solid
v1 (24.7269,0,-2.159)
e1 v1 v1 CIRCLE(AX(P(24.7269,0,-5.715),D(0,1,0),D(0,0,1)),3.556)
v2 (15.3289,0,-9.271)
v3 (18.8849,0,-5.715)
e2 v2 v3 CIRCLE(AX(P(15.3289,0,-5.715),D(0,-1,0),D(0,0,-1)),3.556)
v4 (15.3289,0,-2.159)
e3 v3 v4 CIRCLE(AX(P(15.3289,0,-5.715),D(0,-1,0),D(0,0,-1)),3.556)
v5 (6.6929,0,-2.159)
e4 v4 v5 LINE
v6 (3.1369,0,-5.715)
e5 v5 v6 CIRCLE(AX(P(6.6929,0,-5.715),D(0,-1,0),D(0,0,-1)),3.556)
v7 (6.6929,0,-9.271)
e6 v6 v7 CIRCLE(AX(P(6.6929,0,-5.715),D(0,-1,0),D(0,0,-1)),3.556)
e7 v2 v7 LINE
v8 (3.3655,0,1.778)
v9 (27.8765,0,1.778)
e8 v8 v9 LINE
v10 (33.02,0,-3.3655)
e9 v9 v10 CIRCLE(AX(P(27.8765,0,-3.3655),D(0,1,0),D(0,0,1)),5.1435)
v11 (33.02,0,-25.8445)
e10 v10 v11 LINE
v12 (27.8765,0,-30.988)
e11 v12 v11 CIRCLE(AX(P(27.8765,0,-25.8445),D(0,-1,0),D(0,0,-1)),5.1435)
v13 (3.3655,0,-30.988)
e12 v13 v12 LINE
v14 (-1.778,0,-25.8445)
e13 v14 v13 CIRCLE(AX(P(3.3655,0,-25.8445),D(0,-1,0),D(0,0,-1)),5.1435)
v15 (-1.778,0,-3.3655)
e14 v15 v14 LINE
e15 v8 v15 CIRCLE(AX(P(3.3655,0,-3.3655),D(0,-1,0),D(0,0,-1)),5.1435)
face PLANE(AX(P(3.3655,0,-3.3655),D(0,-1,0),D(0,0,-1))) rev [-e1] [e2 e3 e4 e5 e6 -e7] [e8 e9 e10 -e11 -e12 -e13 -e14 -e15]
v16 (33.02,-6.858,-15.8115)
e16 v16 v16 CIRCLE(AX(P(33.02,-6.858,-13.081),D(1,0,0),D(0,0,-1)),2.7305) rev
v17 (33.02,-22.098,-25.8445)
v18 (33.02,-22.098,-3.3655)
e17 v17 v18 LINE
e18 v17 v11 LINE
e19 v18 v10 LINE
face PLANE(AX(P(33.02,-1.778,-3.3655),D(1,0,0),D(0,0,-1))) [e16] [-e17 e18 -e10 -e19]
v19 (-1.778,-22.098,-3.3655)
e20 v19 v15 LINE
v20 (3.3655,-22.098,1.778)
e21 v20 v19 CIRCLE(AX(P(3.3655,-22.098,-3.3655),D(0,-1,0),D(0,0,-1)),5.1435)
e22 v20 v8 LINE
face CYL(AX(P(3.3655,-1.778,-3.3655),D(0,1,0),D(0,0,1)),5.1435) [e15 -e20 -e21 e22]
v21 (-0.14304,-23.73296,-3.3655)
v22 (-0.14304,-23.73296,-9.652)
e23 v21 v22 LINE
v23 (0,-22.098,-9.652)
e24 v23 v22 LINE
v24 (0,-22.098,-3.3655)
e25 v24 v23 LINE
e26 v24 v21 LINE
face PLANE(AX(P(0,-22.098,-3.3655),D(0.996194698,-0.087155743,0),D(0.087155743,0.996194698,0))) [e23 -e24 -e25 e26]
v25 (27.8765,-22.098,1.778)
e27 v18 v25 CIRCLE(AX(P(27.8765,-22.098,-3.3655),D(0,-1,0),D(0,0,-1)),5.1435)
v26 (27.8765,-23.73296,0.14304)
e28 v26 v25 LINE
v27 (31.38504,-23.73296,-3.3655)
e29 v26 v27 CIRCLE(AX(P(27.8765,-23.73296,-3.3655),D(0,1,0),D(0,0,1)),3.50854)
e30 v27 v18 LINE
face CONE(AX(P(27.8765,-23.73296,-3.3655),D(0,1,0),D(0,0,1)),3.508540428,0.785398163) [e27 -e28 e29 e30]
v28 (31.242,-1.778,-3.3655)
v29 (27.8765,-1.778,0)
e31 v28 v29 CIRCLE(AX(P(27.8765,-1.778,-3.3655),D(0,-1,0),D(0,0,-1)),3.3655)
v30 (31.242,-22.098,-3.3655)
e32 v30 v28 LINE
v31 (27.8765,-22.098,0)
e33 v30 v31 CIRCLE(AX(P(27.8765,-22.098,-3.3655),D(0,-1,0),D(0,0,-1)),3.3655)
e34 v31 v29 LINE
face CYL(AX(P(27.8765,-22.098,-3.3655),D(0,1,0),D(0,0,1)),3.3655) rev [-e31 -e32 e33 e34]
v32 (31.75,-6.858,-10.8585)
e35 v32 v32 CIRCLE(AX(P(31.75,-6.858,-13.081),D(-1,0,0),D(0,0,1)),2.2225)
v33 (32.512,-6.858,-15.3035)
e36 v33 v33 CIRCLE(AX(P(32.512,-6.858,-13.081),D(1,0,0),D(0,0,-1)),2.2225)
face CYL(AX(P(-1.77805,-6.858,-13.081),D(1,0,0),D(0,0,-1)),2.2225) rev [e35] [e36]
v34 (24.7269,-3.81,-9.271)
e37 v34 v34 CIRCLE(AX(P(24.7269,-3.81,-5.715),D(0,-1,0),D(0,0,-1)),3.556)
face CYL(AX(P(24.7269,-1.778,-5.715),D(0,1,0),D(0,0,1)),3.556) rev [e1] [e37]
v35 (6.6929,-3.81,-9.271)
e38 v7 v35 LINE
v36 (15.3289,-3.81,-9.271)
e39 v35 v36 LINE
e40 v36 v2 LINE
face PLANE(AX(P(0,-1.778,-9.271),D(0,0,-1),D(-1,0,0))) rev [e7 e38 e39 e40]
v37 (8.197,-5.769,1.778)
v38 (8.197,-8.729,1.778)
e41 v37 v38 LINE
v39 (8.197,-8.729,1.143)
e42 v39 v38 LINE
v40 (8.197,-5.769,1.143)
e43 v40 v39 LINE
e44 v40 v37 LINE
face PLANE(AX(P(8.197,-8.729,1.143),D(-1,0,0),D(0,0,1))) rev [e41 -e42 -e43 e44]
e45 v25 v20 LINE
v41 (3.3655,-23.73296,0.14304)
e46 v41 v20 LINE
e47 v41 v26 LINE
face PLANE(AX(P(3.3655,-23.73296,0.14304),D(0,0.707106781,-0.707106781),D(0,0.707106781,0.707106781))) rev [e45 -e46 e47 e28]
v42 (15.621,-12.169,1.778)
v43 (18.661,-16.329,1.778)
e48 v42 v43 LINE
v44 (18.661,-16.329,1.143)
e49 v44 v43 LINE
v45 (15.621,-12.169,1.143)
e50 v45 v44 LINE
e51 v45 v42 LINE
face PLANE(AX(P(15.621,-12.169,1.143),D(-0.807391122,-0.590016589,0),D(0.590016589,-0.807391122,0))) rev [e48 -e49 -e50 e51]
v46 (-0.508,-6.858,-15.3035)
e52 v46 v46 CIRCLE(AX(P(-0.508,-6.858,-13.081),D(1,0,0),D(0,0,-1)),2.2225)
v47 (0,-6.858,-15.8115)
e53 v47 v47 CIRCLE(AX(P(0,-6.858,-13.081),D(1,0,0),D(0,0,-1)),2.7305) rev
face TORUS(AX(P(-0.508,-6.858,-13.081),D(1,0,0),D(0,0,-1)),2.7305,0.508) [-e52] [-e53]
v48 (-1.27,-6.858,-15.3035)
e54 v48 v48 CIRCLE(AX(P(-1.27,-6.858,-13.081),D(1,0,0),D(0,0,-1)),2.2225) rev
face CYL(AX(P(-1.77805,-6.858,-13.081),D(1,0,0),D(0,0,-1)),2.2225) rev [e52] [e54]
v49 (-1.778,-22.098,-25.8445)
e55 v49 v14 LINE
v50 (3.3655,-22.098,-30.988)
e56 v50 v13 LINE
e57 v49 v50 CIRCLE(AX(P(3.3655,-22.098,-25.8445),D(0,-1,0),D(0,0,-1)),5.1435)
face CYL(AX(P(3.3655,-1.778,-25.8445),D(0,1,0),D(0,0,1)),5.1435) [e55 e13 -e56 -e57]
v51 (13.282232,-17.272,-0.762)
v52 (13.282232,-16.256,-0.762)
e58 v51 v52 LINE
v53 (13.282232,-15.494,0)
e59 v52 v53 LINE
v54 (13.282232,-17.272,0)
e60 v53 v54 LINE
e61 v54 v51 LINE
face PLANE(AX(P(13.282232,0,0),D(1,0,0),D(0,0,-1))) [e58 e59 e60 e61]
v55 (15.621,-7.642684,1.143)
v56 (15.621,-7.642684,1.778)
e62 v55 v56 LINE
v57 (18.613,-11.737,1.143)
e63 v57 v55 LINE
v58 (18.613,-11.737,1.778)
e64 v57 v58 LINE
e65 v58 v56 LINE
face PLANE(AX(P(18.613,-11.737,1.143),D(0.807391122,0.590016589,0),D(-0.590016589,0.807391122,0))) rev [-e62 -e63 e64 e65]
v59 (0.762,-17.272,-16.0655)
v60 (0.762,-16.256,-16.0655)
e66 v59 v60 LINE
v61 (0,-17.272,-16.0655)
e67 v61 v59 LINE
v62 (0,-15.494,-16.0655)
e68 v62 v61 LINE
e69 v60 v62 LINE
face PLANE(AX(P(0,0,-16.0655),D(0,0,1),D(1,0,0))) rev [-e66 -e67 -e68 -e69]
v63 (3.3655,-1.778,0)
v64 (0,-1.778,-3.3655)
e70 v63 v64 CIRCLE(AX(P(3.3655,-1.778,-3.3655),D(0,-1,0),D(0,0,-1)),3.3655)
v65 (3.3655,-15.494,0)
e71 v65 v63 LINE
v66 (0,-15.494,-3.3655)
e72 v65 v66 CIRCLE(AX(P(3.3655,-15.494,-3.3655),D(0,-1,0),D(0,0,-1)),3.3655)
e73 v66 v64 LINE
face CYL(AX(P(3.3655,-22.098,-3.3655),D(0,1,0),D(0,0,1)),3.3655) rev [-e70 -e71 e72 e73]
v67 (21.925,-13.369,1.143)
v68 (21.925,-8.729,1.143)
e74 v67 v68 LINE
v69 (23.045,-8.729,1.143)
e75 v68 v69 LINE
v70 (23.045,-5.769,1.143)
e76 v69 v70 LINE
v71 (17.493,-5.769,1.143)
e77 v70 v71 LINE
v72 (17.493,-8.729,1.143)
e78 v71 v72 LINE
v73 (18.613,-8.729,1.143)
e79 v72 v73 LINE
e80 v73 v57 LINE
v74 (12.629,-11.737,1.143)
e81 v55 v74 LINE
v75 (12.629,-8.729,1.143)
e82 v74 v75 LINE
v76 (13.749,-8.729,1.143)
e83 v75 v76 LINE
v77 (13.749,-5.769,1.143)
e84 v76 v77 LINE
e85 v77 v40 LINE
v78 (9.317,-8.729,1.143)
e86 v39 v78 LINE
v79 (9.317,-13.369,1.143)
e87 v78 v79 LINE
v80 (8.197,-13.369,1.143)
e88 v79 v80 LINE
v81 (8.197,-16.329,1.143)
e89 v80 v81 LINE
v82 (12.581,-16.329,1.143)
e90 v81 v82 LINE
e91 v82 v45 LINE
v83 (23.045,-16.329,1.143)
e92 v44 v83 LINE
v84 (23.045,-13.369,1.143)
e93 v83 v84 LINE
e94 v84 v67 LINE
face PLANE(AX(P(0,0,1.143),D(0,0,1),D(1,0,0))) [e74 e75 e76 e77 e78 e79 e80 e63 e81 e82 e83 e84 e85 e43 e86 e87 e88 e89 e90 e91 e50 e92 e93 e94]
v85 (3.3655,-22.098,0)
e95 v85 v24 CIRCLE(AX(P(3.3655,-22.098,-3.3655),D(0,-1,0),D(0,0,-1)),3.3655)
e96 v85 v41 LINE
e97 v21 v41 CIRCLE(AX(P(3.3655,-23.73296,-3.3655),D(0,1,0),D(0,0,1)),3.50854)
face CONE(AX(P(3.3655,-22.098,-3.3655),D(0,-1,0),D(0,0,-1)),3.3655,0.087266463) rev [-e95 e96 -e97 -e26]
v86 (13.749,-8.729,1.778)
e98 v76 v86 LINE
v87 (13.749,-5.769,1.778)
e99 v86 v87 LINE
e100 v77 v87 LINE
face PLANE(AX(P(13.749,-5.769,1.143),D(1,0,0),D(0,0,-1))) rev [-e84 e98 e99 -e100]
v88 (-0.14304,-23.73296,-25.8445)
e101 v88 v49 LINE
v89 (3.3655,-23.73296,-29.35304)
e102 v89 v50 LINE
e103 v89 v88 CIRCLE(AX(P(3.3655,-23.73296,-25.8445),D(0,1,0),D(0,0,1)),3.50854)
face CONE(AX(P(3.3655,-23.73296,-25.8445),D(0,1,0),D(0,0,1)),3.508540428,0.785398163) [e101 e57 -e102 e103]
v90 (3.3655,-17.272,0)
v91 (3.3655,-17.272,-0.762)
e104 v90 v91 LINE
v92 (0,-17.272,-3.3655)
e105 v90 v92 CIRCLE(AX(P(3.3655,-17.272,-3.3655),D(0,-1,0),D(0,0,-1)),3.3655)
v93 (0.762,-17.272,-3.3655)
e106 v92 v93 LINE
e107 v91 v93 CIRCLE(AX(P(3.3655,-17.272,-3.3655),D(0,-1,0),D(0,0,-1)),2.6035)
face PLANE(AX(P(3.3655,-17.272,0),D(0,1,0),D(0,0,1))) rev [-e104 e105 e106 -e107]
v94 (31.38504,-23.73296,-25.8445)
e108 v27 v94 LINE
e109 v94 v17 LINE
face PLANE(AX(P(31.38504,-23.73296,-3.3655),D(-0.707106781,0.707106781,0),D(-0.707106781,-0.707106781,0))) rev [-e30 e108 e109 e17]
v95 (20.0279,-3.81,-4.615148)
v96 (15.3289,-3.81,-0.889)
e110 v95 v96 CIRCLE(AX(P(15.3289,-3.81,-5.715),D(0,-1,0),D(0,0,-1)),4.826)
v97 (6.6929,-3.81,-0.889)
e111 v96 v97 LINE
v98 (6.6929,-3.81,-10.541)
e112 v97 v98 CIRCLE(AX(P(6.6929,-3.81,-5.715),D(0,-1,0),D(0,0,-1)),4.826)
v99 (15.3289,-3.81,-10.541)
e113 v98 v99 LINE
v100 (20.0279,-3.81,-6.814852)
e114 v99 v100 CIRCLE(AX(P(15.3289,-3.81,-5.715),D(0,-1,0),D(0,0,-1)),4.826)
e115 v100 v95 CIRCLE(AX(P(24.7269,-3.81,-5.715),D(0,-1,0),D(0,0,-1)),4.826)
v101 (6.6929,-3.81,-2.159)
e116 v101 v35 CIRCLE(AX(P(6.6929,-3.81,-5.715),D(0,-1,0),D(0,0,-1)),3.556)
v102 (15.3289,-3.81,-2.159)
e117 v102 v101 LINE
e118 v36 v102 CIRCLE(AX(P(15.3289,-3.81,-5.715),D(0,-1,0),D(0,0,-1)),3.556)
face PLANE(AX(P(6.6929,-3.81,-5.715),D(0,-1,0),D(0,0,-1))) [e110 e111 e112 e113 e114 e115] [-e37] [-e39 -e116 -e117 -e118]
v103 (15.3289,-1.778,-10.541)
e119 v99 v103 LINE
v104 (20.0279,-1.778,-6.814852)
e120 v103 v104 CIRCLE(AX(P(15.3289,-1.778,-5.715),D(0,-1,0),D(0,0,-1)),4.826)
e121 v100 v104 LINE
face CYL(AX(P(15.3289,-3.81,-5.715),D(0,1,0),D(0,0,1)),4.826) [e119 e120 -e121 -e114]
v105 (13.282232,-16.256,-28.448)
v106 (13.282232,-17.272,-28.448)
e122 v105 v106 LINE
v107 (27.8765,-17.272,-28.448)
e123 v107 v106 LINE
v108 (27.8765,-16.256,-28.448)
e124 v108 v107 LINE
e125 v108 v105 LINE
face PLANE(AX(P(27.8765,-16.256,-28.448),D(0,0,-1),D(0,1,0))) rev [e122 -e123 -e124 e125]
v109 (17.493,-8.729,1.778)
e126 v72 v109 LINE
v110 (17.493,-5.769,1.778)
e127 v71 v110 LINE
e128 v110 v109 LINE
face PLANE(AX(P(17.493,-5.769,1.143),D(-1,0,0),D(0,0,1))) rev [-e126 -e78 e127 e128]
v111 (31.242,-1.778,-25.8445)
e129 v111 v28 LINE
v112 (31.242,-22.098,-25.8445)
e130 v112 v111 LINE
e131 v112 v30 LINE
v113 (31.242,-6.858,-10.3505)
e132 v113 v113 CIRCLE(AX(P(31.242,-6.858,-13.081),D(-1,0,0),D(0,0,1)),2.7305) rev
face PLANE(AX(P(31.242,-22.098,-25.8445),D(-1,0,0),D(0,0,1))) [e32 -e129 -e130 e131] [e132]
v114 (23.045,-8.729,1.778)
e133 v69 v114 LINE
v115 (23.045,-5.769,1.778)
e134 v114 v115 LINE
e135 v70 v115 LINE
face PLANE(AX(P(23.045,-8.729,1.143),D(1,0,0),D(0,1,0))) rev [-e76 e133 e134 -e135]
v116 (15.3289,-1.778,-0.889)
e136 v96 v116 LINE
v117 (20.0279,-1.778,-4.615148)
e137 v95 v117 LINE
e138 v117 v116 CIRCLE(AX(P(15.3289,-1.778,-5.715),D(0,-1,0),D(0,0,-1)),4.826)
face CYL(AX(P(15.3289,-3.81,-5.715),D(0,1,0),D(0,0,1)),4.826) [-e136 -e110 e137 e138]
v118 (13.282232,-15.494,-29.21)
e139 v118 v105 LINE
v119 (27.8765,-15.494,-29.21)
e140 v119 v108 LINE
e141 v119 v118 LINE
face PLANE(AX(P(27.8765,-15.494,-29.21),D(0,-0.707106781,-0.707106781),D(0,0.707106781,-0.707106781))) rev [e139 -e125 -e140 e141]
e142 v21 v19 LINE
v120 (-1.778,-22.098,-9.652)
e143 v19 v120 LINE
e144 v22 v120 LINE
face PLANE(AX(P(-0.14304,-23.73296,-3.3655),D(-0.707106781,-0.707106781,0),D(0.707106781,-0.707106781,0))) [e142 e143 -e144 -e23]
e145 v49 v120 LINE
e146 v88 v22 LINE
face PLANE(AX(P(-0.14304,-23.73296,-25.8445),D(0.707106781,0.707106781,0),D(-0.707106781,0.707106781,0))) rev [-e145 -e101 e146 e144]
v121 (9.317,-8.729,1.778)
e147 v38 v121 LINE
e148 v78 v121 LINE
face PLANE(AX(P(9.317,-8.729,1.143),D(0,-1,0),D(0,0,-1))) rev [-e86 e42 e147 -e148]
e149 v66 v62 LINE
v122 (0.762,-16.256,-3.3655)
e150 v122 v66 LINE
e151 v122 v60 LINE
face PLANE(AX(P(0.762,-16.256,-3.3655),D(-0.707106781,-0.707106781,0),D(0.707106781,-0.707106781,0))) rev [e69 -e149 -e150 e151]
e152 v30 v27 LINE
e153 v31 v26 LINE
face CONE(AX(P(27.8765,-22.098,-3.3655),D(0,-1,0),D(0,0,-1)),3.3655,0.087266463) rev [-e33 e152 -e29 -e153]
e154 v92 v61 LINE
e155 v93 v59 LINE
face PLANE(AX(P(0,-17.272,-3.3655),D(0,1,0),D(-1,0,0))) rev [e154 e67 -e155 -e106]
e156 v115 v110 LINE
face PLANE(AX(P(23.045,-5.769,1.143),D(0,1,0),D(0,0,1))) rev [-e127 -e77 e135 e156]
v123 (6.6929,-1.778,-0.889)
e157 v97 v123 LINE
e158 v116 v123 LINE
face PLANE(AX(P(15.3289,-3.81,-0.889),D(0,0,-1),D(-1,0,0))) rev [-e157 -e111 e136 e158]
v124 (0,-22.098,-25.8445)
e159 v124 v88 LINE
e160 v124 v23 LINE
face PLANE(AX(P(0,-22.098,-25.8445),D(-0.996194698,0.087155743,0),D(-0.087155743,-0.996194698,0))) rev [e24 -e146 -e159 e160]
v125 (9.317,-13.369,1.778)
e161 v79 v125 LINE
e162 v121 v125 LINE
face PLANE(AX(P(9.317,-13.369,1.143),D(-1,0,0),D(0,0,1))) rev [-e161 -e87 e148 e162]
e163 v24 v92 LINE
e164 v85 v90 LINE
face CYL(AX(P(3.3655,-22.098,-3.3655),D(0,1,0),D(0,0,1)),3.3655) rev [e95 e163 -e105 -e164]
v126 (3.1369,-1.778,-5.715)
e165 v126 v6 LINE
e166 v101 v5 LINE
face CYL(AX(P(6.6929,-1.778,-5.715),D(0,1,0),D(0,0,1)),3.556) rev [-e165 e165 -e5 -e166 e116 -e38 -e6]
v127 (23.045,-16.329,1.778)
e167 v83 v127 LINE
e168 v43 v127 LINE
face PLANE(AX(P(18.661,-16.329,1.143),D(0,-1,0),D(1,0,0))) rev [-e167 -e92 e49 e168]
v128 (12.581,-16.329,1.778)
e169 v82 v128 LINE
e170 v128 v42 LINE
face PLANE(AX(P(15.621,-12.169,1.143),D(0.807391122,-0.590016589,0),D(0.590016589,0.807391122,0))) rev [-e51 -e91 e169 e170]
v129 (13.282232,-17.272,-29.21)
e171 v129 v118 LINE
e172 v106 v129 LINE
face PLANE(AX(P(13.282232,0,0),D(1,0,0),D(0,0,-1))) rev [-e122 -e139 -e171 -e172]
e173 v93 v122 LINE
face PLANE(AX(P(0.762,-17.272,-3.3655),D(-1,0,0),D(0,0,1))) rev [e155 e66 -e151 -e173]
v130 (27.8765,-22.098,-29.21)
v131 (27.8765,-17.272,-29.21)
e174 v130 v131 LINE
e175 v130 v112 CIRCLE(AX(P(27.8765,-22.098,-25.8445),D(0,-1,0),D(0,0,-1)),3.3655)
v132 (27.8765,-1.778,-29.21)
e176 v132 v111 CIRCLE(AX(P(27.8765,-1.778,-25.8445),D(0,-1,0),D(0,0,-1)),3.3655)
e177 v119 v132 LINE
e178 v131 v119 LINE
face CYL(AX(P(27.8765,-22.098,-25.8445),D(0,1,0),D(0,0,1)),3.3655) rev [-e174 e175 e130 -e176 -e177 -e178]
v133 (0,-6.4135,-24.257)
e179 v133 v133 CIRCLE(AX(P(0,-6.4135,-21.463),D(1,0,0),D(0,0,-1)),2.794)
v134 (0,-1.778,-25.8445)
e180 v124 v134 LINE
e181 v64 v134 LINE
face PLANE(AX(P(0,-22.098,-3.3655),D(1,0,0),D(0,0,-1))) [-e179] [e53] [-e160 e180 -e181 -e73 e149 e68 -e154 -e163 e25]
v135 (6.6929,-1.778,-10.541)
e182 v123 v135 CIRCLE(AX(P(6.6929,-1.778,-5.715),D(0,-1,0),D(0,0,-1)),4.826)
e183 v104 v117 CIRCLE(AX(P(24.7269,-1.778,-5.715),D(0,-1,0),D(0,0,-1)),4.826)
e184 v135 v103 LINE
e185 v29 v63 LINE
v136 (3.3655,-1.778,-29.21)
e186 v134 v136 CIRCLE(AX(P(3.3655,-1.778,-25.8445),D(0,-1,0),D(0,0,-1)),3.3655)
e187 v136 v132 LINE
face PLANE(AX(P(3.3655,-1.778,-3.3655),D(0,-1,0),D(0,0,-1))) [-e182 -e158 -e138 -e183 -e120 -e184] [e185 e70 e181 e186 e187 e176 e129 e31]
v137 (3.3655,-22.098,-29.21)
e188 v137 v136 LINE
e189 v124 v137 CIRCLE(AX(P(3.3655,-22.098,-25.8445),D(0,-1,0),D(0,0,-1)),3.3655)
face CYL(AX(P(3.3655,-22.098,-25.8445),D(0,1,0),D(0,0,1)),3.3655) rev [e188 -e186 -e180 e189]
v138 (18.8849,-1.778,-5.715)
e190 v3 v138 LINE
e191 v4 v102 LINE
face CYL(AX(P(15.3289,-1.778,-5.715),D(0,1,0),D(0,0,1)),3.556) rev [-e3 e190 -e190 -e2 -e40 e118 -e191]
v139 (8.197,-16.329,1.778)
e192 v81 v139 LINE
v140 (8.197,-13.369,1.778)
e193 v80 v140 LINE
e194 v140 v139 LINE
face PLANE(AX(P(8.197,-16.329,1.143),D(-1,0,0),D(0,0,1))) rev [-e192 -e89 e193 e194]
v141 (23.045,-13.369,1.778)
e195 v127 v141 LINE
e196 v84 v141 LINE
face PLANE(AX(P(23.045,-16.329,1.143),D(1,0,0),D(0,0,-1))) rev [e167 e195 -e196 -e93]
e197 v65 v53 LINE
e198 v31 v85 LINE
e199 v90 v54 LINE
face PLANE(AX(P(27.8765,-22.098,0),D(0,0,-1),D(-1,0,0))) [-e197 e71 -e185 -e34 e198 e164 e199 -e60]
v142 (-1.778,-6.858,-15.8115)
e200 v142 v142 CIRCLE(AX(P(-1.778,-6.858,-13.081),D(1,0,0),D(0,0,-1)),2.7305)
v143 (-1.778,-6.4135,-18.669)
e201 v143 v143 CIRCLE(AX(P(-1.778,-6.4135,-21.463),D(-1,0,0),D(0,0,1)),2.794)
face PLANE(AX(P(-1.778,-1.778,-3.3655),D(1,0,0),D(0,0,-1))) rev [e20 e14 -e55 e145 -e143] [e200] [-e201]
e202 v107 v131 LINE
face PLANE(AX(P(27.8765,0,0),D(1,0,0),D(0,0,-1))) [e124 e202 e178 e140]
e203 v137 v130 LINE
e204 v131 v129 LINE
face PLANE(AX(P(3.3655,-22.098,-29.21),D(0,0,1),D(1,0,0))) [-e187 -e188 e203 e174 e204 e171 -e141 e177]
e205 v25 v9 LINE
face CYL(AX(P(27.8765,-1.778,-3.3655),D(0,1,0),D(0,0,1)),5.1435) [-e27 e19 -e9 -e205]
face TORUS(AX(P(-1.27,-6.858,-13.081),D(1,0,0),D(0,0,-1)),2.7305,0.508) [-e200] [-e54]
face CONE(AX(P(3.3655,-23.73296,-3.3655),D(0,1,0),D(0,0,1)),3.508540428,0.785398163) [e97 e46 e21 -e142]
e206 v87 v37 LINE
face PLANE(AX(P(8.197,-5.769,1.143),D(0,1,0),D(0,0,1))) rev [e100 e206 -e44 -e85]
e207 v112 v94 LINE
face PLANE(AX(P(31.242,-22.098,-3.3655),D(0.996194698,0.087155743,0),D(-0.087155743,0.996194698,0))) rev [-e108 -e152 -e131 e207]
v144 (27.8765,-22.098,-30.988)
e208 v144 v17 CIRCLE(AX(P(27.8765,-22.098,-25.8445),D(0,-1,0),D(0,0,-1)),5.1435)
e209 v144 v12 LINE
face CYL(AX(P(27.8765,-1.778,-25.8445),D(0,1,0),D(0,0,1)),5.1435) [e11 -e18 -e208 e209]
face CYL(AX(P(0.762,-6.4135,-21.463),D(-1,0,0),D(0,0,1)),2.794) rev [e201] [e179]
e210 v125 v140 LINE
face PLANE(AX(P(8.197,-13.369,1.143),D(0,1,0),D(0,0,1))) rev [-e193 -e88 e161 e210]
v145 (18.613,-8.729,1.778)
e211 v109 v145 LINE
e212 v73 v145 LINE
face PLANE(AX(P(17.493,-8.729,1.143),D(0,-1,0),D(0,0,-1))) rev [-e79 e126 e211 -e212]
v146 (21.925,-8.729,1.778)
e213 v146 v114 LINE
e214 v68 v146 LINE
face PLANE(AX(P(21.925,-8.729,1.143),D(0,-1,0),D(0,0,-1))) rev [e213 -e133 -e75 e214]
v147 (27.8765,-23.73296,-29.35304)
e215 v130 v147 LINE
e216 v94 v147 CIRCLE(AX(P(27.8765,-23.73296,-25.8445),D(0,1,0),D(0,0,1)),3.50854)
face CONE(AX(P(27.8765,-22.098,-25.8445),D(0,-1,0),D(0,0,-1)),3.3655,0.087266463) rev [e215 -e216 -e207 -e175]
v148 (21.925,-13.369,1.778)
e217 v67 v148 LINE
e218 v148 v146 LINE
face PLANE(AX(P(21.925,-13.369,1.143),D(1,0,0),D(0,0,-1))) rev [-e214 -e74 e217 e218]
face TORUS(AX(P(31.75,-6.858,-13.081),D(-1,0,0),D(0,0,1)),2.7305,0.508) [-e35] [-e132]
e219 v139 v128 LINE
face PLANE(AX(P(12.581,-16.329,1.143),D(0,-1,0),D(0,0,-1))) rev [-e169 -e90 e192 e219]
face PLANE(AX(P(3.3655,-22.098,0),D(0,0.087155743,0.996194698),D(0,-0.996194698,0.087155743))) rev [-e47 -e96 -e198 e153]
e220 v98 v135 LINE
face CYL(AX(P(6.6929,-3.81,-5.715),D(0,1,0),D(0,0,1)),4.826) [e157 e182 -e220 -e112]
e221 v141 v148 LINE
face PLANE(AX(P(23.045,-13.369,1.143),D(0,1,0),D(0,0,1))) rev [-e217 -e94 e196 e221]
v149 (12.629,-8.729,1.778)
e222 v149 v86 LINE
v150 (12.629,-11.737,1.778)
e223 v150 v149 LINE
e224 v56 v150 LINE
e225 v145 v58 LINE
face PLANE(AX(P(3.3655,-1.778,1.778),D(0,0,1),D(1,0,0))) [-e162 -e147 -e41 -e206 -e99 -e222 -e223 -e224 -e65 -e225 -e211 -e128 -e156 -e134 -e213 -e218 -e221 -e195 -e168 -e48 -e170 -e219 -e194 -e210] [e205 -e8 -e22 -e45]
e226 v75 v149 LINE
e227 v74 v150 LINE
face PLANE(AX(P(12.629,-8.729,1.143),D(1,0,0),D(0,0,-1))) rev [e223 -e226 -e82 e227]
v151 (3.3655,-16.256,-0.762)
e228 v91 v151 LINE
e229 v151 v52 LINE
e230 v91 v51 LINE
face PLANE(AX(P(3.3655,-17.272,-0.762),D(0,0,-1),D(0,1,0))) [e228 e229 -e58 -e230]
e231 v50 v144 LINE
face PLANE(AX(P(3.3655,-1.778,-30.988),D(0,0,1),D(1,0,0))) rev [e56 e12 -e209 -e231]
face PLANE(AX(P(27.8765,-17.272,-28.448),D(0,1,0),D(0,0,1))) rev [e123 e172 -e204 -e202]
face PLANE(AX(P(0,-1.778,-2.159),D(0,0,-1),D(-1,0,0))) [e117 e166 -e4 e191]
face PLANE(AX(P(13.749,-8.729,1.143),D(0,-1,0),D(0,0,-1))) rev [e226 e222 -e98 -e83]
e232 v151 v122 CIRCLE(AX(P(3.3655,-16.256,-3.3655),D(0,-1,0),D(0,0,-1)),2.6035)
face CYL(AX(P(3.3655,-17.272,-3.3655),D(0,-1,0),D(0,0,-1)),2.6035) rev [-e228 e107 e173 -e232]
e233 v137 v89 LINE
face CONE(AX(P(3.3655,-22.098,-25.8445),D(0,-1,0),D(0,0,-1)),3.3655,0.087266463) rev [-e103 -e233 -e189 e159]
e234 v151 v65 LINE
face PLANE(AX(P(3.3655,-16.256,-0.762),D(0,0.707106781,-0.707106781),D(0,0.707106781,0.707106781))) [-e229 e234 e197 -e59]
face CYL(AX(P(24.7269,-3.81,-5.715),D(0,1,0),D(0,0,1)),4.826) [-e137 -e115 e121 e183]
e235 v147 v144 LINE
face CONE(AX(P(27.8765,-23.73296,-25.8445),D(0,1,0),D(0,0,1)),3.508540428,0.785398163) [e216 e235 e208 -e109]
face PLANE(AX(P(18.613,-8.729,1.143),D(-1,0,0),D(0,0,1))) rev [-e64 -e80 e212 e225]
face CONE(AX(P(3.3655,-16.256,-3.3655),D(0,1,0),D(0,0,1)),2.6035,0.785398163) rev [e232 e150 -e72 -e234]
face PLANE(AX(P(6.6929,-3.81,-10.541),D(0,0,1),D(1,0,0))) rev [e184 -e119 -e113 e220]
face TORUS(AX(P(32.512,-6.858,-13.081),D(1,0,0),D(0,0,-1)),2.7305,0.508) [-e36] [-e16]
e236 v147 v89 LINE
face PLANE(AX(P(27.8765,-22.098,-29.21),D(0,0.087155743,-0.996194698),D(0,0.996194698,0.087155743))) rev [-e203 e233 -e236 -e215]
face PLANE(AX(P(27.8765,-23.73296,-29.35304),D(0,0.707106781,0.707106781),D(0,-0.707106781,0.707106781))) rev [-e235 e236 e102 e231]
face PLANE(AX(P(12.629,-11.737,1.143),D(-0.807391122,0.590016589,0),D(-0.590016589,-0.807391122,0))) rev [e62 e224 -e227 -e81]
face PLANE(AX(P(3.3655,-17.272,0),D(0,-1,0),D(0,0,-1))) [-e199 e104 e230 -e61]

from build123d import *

# Parameters (mm, degrees)
BOSS_EXTRUDE1_DEPTH = 1.778
BOSS_EXTRUDE2_DEPTH = 20.32
SKETCH5_R           = 3.556
SKETCH5_W           = 15.748
SKETCH5_H           = 7.112
CUT_EXTRUDE1_DEPTH  = 1.778
FILLET1_R           = 3.556
SKETCH9_R           = 3.556
BOSS_EXTRUDE3_DEPTH = 2.032
SWEEP2_START        = 13.282231977
SWEEP2_DEPTH        = 14.594268023
CUT_EXTRUDE4_DEPTH  = 0.635
SKETCH17_R          = 2.2225
CUT_EXTRUDE5_DEPTH  = 53.291589362
FILLET2_R           = 0.508
SKETCH19_R          = 2.794
CUT_EXTRUDE6_DEPTH  = 2.54


# Read off the part's stored shape, not the designer's step: Sweep2
with BuildPart() as part:
    # Sketch1 → Boss-Extrude1 (new body)
    with BuildSketch(Plane(origin=(0, 0, 0), x_dir=(1, 0, 0), z_dir=(0, 1, 0))):
        with BuildLine():
            Line((-1.778, 3.3655), (-1.778, 25.8445))
            ThreePointArc((-1.778, 25.8445), (-0.271503729, 29.481503729), (3.3655, 30.988))
            Line((3.3655, 30.988), (27.8765, 30.988))
            ThreePointArc((27.8765, 30.988), (31.513503729, 29.481503729), (33.02, 25.8445))
            Line((33.02, 25.8445), (33.02, 3.3655))
            ThreePointArc((33.02, 3.3655), (31.513503729, -0.271503729), (27.8765, -1.778))
            Line((27.8765, -1.778), (3.3655, -1.778))
            ThreePointArc((3.3655, -1.778), (-0.271503729, -0.271503729), (-1.778, 3.3655))
        make_face()
    extrude(amount=-BOSS_EXTRUDE1_DEPTH)

    # Sketch3 → Boss-Extrude2 (add)
    with BuildSketch(Plane.XZ.offset(1.778)):
        with BuildLine():
            Line((27.8765, 1.778), (3.3655, 1.778))
            ThreePointArc((3.3655, 1.778), (-0.271503729, 0.271503729), (-1.778, -3.3655))
            Line((-1.778, -3.3655), (-1.778, -25.8445))
            ThreePointArc((-1.778, -25.8445), (-0.271503729, -29.481503729), (3.3655, -30.988))
            Line((3.3655, -30.988), (27.8765, -30.988))
            ThreePointArc((27.8765, -30.988), (31.513503729, -29.481503729), (33.02, -25.8445))
            Line((33.02, -25.8445), (33.02, -3.3655))
            ThreePointArc((33.02, -3.3655), (31.513503729, 0.271503729), (27.8765, 1.778))
        make_face()
        with BuildLine():
            Line((0, -3.3655), (0, -25.8445))
            ThreePointArc((0, -25.8445), (0.985732128, -28.224267872), (3.3655, -29.21))
            Line((3.3655, -29.21), (27.8765, -29.21))
            ThreePointArc((27.8765, -29.21), (30.256267872, -28.224267872), (31.242, -25.8445))
            Line((31.242, -25.8445), (31.242, -3.3655))
            ThreePointArc((31.242, -3.3655), (30.256267872, -0.985732128), (27.8765, 0))
            Line((27.8765, 0), (3.3655, 0))
            ThreePointArc((3.3655, 0), (0.985732128, -0.985732128), (0, -3.3655))
        make_face(mode=Mode.SUBTRACT)
    extrude(amount=BOSS_EXTRUDE2_DEPTH)

    # Sketch5 → Cut-Extrude1 (cut)
    with BuildSketch(Plane(origin=(0, 0, 0), x_dir=(1, 0, 0), z_dir=(0, 1, 0))):
        with Locations(Location((24.7269, 5.715, 0), (0, 0, 270))):
            Circle(SKETCH5_R)
        with Locations((11.0109, 5.715)):
            Rectangle(SKETCH5_W, SKETCH5_H)
    extrude(amount=-CUT_EXTRUDE1_DEPTH, mode=Mode.SUBTRACT)

    # Fillet1
    fillet1_edges = [part.edges().sort_by_distance(p)[0] for p in [
        (3.1369, -0.889, -2.159),
        (18.8849, -0.889, -2.159),
        (18.8849, -0.889, -9.271),
        (3.1369, -0.889, -9.271),
    ]]
    fillet(fillet1_edges, radius=FILLET1_R - 0.0001)  # a hair under: the kernel refuses the full size

    # Sketch9 → Boss-Extrude3 (add)
    with BuildSketch(Plane.XZ.offset(1.778)):
        with BuildLine():
            Line((6.6929, -10.541), (15.3289, -10.541))
            ThreePointArc((15.3289, -10.541), (18.327432056, -9.496412634), (20.0279, -6.814852263))
            ThreePointArc((20.0279, -6.814852263), (29.5529, -5.715), (20.0279, -4.615147737))
            ThreePointArc((20.0279, -4.615147737), (18.327432056, -1.933587366), (15.3289, -0.889))
            Line((15.3289, -0.889), (6.6929, -0.889))
            ThreePointArc((6.6929, -0.889), (3.280402674, -2.302502674), (1.8669, -5.715))
            ThreePointArc((1.8669, -5.715), (3.280402674, -9.127497326), (6.6929, -10.541))
        make_face()
        with Locations(Location((24.7269, -5.715, 0), (0, 0, 90))):
            Circle(SKETCH9_R, mode=Mode.SUBTRACT)
        with BuildLine():
            Line((6.6929, -9.271), (15.3289, -9.271))
            ThreePointArc((15.3289, -9.271), (17.843371714, -8.229471714), (18.8849, -5.715))
            ThreePointArc((18.8849, -5.715), (17.843371714, -3.200528286), (15.3289, -2.159))
            Line((15.3289, -2.159), (6.6929, -2.159))
            ThreePointArc((6.6929, -2.159), (4.178428286, -3.200528286), (3.1369, -5.715))
            ThreePointArc((3.1369, -5.715), (4.178428286, -8.229471714), (6.6929, -9.271))
        make_face(mode=Mode.SUBTRACT)
    extrude(amount=BOSS_EXTRUDE3_DEPTH)

    # Sweep1: sweep along a path in Sketch12
    with BuildLine(Plane.XZ.offset(22.098)) as sweep1_path:
        Line((31.242, -25.8445), (31.242, -3.3655))
        ThreePointArc((31.242, -3.3655), (30.256267872, -0.985732128), (27.8765, 0))
        Line((27.8765, 0), (3.3655, 0))
        ThreePointArc((3.3655, 0), (0.985732128, -0.985732128), (0, -3.3655))
        Line((0, -3.3655), (0, -25.8445))
        ThreePointArc((0, -25.8445), (0.985732128, -28.224267872), (3.3655, -29.21))
        Line((3.3655, -29.21), (27.8765, -29.21))
        ThreePointArc((27.8765, -29.21), (30.256267872, -28.224267872), (31.242, -25.8445))
    # Sketch11 → Sweep1 (sweep)
    with BuildSketch(Plane(origin=(0, 0, -9.652), x_dir=(-1, 0, 0), z_dir=(0, 0, -1))):
        Polygon((1.778, -22.098), (0, -22.098), (0.143040428, -23.732959572), align=None)
    sweep(path=sweep1_path.line)

    # Sweep2 outline → Sweep2 (add)
    with BuildSketch(Plane.YZ.offset(SWEEP2_START)):
        Polygon((-17.272, -28.448), (-17.272, -29.21), (-15.494, -29.21), (-16.256, -28.448), align=None)
    extrude(amount=SWEEP2_DEPTH)

    # Sketch16 → Cut-Extrude4 (cut)
    with BuildSketch(Plane.XY.offset(1.778)):
        Polygon((23.045, -16.329), (23.045, -13.369), (21.925, -13.369), (21.925, -8.729), (23.045, -8.729), (23.045, -5.769), (17.493, -5.769), (17.493, -8.729), (18.613, -8.729), (18.613, -11.737), (15.621, -7.642684211), (12.629, -11.737), (12.629, -8.729), (13.749, -8.729), (13.749, -5.769), (8.197, -5.769), (8.197, -8.729), (9.317, -8.729), (9.317, -13.369), (8.197, -13.369), (8.197, -16.329), (12.581, -16.329), (15.621, -12.169), (18.661, -16.329), align=None)
    extrude(amount=-CUT_EXTRUDE4_DEPTH, mode=Mode.SUBTRACT)

    # Sketch17 → Cut-Extrude5 (cut, through all)
    with BuildSketch(Plane(origin=(33.02, 0, 0), x_dir=(0, 0, -1), z_dir=(1, 0, 0))):
        with Locations((13.081, -6.858)):
            Circle(SKETCH17_R)
    extrude(amount=-CUT_EXTRUDE5_DEPTH, mode=Mode.SUBTRACT)

    # Fillet2
    fillet2_edges = [part.edges().sort_by_distance(p)[0] for p in [
        (-1.778, -6.858, -10.8585),
        (31.242, -6.858, -10.8585),
        (0, -6.858, -10.8585),
        (33.02, -6.858, -10.8585),
    ]]
    fillet(fillet2_edges, radius=FILLET2_R)

    # Sketch19 → Cut-Extrude6 (cut)
    with BuildSketch(Plane.ZY.offset(1.778)):
        with Locations((-21.463, -6.4135)):
            Circle(SKETCH19_R)
    extrude(amount=-CUT_EXTRUDE6_DEPTH, mode=Mode.SUBTRACT)

    # Sweep3: sweep along a path in Sketch21
    with BuildLine(Plane(origin=(0, -17.272, 0), x_dir=(-1, 0, 0), z_dir=(0, -1, 0))) as sweep3_path:
        Line((-13.282231977, 0), (-3.3655, 0))
        ThreePointArc((-3.3655, 0), (-0.985732128, 0.985732128), (0, 3.3655))
        Line((0, 3.3655), (0, 16.0655))
    # Sketch20 → Sweep3 (sweep)
    with BuildSketch(Plane(origin=(13.282231977, 0, 0), x_dir=(0, 0, -1), z_dir=(1, 0, 0))):
        Polygon((0, -15.494), (0, -17.272), (0.762, -17.272), (0.762, -16.256), align=None)
    sweep(path=sweep3_path.line)


solid = part.part
